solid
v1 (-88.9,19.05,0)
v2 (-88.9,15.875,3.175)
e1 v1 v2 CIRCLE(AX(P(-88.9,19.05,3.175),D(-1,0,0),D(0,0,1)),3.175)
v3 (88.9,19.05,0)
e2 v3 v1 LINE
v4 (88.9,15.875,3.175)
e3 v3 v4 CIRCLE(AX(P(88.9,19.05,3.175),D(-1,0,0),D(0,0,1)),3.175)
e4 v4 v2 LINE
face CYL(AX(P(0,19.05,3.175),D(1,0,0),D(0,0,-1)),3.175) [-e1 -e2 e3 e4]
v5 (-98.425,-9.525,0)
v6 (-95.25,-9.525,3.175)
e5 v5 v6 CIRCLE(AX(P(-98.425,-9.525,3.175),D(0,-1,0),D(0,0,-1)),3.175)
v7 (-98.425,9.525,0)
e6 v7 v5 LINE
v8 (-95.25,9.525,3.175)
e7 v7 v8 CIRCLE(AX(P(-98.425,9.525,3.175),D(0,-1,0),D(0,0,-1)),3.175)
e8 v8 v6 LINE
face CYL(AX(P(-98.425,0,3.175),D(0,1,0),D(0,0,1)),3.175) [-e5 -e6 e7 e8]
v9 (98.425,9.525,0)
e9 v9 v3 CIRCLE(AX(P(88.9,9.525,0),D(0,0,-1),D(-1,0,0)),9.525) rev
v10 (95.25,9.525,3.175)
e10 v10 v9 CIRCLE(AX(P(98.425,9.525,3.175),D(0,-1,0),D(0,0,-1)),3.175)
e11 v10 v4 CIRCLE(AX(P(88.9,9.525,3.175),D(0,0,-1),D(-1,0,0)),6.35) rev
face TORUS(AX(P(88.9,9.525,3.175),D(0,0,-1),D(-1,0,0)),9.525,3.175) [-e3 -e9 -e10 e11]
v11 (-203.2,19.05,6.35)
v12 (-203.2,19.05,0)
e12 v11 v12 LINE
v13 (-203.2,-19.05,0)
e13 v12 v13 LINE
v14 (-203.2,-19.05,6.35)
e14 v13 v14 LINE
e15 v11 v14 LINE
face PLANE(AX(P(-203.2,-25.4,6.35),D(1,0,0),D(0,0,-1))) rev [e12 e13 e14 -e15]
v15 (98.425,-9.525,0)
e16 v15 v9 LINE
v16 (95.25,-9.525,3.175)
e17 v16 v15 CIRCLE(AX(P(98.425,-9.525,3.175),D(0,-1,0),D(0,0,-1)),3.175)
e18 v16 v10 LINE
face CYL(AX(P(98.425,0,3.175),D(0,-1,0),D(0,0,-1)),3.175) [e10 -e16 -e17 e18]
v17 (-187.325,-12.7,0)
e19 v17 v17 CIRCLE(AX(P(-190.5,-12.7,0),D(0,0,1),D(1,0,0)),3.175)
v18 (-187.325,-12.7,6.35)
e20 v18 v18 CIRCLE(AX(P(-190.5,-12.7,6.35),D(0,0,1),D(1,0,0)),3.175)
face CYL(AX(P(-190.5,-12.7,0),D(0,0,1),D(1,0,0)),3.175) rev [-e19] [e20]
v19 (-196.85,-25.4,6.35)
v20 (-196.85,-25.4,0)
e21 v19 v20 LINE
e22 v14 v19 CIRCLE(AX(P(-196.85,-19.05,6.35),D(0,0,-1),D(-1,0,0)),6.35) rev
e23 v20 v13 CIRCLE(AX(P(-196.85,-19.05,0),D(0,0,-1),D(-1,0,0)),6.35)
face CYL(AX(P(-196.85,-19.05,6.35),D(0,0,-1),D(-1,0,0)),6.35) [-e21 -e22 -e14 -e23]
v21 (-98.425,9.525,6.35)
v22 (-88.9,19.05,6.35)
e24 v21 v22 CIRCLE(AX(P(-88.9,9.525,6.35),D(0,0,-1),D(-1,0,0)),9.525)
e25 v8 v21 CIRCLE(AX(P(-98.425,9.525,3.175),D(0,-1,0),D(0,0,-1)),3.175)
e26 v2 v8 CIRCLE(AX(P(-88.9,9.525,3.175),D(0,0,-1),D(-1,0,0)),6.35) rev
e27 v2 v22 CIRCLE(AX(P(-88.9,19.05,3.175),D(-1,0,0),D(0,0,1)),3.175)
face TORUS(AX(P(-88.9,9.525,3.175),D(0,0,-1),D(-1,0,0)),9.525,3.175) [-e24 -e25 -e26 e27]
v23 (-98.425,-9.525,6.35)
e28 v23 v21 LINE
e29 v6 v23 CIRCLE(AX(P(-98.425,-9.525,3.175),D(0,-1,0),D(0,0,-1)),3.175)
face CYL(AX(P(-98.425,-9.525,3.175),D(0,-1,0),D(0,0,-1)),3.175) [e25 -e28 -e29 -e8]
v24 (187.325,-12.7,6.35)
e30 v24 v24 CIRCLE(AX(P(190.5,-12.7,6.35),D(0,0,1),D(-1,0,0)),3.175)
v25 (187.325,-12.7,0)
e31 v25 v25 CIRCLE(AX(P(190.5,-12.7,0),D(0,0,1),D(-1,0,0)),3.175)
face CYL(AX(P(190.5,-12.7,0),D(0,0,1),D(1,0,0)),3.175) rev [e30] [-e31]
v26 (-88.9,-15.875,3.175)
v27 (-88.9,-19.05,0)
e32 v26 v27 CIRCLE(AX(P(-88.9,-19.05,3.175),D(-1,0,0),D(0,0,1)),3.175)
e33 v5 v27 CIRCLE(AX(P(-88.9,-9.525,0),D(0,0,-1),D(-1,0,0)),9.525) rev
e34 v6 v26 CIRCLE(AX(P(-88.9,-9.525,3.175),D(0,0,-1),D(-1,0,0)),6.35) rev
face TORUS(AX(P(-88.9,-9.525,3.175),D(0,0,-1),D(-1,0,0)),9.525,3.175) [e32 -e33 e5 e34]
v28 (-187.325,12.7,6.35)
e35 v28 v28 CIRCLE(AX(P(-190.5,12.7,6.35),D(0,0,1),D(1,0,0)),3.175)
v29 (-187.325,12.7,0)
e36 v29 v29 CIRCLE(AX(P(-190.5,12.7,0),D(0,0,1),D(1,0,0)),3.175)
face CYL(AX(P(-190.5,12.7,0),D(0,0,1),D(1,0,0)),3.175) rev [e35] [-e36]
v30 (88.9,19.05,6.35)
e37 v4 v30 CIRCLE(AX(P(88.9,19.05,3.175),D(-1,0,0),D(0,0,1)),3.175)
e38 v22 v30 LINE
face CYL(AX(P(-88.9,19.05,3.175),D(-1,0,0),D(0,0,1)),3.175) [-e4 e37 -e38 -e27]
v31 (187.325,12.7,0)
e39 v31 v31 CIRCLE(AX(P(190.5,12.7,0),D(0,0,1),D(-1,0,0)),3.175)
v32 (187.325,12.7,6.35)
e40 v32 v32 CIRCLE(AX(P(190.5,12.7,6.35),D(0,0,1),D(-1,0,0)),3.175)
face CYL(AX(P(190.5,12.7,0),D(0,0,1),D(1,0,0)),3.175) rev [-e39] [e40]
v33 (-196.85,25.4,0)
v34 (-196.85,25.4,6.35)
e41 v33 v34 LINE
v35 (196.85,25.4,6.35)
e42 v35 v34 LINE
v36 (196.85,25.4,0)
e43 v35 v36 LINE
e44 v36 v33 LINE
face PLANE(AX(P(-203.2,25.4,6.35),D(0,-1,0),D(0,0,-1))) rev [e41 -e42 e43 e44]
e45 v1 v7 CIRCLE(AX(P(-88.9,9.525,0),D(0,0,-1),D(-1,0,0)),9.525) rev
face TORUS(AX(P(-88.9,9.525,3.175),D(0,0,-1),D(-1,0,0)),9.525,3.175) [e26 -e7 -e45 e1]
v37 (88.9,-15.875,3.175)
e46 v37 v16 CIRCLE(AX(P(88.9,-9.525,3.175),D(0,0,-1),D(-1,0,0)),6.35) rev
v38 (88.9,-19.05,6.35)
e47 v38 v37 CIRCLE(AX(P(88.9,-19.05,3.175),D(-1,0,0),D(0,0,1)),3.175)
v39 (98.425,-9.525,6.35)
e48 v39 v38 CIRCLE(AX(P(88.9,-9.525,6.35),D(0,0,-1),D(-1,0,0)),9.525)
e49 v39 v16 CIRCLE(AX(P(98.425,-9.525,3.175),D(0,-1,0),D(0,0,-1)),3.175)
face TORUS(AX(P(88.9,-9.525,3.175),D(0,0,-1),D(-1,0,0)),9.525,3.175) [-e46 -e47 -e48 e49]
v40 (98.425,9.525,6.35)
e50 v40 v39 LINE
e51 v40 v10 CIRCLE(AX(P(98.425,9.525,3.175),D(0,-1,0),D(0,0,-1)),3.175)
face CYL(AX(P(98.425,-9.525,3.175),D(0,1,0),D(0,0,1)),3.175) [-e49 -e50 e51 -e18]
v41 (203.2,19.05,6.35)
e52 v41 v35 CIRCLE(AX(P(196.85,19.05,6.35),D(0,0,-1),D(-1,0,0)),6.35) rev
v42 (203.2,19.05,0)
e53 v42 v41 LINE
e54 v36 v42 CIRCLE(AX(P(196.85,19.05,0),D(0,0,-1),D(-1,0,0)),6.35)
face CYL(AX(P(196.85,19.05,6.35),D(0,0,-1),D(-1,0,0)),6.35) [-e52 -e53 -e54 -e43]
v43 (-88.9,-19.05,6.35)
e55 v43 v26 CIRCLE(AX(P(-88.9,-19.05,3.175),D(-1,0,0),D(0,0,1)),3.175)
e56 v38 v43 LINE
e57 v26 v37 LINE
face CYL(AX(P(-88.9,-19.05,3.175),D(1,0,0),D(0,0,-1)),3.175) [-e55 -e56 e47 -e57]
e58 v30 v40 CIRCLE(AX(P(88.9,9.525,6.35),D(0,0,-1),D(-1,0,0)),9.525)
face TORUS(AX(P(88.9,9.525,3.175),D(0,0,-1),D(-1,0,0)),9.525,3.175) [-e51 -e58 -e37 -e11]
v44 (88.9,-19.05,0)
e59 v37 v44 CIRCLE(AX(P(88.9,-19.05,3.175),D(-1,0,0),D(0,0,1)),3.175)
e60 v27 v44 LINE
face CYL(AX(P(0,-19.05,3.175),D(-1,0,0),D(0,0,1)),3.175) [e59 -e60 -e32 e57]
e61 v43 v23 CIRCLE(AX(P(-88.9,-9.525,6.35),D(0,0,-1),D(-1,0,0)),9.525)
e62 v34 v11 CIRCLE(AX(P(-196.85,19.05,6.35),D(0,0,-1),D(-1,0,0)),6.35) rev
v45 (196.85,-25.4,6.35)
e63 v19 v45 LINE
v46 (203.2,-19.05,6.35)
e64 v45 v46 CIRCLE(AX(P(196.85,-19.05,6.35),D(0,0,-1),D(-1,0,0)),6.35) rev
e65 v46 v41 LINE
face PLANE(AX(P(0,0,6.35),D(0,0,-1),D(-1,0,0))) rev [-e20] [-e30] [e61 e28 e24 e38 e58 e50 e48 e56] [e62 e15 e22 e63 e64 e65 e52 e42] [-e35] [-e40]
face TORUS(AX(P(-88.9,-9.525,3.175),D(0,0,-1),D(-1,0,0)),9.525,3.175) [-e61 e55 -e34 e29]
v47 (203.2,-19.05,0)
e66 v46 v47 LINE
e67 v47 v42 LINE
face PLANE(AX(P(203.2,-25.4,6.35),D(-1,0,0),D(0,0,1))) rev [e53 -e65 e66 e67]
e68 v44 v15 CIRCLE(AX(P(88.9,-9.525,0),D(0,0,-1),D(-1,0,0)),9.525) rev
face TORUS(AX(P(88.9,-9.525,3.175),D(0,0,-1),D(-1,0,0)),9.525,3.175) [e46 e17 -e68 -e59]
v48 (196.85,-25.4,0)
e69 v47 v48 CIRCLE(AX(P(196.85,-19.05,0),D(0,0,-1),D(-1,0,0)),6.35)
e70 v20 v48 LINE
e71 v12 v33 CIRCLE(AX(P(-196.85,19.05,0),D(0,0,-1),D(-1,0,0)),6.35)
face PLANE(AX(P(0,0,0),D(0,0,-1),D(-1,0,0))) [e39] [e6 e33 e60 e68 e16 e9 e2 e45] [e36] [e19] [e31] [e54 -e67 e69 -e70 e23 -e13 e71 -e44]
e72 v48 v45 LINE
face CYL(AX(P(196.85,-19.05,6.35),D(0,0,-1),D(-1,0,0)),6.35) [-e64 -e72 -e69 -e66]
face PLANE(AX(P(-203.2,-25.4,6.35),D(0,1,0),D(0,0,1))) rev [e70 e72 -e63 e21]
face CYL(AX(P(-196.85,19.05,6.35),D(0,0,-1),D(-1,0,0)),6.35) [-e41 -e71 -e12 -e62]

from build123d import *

# Parameters (mm, degrees)
SKETCH1_W           = 406.4
SKETCH1_H           = 50.8
BOSS_EXTRUDE1_DEPTH = 6.35
CUT_EXTRUDE1_DEPTH  = 6.35
FILLET1_R           = 6.35
SKETCH3_R           = 3.175
CUT_EXTRUDE2_DEPTH  = 6.35
FILLET3_R           = 3.175


with BuildPart() as part:
    # Sketch1 → Boss-Extrude1 (new body)
    with BuildSketch(Plane.XY):
        Rectangle(SKETCH1_W, SKETCH1_H)
    extrude(amount=BOSS_EXTRUDE1_DEPTH)

    # Sketch2 → Cut-Extrude1 (cut)
    with BuildSketch(Plane.XY.offset(6.35)):
        with BuildLine():
            Line((-88.9, -15.875), (88.9, -15.875))
            ThreePointArc((88.9, -15.875), (93.390128061, -14.015128061), (95.25, -9.525))
            Line((95.25, -9.525), (95.25, 9.525))
            ThreePointArc((95.25, 9.525), (93.390128061, 14.015128061), (88.9, 15.875))
            Line((88.9, 15.875), (-88.9, 15.875))
            ThreePointArc((-88.9, 15.875), (-93.390128061, 14.015128061), (-95.25, 9.525))
            Line((-95.25, 9.525), (-95.25, -9.525))
            ThreePointArc((-95.25, -9.525), (-93.390128061, -14.015128061), (-88.9, -15.875))
        make_face()
    extrude(amount=-CUT_EXTRUDE1_DEPTH, mode=Mode.SUBTRACT)

    # Fillet1
    fillet1_edges = [part.edges().sort_by_distance(p)[0] for p in [
        (203.2, -25.4, 3.175),
        (-203.2, -25.4, 3.175),
        (-203.2, 25.4, 3.175),
        (203.2, 25.4, 3.175),
    ]]
    fillet(fillet1_edges, radius=FILLET1_R)

    # Sketch3 → Cut-Extrude2 (cut)
    with BuildSketch(Plane.XY.offset(6.35)):
        with Locations((-190.5, 12.7)):
            Circle(SKETCH3_R)
        with Locations((-190.5, -12.7)):
            Circle(SKETCH3_R)
        with Locations(Location((190.5, -12.7, 0), (0, 0, 180))):
            Circle(SKETCH3_R)
        with Locations(Location((190.5, 12.7, 0), (0, 0, 180))):
            Circle(SKETCH3_R)
    extrude(amount=-CUT_EXTRUDE2_DEPTH, mode=Mode.SUBTRACT)

    # Fillet3
    fillet3_edges = [part.edges().sort_by_distance(p)[0] for p in [
        (-93.390128061, -14.015128061, 0),
        (-95.25, 0, 0),
        (-93.390128061, 14.015128061, 0),
        (0, 15.875, 0),
        (93.390128061, 14.015128061, 0),
        (95.25, 0, 0),
        (93.390128061, -14.015128061, 0),
        (-93.390128061, -14.015128061, 6.35),
        (-95.25, 0, 6.35),
        (-93.390128061, 14.015128061, 6.35),
        (0, 15.875, 6.35),
        (93.390128061, 14.015128061, 6.35),
        (95.25, 0, 6.35),
        (93.390128061, -14.015128061, 6.35),
        (0, -15.875, 0),
        (0, -15.875, 6.35),
    ]]
    fillet(fillet3_edges, radius=FILLET3_R - 0.0001)  # a hair under: the kernel refuses the full size


solid = part.part
